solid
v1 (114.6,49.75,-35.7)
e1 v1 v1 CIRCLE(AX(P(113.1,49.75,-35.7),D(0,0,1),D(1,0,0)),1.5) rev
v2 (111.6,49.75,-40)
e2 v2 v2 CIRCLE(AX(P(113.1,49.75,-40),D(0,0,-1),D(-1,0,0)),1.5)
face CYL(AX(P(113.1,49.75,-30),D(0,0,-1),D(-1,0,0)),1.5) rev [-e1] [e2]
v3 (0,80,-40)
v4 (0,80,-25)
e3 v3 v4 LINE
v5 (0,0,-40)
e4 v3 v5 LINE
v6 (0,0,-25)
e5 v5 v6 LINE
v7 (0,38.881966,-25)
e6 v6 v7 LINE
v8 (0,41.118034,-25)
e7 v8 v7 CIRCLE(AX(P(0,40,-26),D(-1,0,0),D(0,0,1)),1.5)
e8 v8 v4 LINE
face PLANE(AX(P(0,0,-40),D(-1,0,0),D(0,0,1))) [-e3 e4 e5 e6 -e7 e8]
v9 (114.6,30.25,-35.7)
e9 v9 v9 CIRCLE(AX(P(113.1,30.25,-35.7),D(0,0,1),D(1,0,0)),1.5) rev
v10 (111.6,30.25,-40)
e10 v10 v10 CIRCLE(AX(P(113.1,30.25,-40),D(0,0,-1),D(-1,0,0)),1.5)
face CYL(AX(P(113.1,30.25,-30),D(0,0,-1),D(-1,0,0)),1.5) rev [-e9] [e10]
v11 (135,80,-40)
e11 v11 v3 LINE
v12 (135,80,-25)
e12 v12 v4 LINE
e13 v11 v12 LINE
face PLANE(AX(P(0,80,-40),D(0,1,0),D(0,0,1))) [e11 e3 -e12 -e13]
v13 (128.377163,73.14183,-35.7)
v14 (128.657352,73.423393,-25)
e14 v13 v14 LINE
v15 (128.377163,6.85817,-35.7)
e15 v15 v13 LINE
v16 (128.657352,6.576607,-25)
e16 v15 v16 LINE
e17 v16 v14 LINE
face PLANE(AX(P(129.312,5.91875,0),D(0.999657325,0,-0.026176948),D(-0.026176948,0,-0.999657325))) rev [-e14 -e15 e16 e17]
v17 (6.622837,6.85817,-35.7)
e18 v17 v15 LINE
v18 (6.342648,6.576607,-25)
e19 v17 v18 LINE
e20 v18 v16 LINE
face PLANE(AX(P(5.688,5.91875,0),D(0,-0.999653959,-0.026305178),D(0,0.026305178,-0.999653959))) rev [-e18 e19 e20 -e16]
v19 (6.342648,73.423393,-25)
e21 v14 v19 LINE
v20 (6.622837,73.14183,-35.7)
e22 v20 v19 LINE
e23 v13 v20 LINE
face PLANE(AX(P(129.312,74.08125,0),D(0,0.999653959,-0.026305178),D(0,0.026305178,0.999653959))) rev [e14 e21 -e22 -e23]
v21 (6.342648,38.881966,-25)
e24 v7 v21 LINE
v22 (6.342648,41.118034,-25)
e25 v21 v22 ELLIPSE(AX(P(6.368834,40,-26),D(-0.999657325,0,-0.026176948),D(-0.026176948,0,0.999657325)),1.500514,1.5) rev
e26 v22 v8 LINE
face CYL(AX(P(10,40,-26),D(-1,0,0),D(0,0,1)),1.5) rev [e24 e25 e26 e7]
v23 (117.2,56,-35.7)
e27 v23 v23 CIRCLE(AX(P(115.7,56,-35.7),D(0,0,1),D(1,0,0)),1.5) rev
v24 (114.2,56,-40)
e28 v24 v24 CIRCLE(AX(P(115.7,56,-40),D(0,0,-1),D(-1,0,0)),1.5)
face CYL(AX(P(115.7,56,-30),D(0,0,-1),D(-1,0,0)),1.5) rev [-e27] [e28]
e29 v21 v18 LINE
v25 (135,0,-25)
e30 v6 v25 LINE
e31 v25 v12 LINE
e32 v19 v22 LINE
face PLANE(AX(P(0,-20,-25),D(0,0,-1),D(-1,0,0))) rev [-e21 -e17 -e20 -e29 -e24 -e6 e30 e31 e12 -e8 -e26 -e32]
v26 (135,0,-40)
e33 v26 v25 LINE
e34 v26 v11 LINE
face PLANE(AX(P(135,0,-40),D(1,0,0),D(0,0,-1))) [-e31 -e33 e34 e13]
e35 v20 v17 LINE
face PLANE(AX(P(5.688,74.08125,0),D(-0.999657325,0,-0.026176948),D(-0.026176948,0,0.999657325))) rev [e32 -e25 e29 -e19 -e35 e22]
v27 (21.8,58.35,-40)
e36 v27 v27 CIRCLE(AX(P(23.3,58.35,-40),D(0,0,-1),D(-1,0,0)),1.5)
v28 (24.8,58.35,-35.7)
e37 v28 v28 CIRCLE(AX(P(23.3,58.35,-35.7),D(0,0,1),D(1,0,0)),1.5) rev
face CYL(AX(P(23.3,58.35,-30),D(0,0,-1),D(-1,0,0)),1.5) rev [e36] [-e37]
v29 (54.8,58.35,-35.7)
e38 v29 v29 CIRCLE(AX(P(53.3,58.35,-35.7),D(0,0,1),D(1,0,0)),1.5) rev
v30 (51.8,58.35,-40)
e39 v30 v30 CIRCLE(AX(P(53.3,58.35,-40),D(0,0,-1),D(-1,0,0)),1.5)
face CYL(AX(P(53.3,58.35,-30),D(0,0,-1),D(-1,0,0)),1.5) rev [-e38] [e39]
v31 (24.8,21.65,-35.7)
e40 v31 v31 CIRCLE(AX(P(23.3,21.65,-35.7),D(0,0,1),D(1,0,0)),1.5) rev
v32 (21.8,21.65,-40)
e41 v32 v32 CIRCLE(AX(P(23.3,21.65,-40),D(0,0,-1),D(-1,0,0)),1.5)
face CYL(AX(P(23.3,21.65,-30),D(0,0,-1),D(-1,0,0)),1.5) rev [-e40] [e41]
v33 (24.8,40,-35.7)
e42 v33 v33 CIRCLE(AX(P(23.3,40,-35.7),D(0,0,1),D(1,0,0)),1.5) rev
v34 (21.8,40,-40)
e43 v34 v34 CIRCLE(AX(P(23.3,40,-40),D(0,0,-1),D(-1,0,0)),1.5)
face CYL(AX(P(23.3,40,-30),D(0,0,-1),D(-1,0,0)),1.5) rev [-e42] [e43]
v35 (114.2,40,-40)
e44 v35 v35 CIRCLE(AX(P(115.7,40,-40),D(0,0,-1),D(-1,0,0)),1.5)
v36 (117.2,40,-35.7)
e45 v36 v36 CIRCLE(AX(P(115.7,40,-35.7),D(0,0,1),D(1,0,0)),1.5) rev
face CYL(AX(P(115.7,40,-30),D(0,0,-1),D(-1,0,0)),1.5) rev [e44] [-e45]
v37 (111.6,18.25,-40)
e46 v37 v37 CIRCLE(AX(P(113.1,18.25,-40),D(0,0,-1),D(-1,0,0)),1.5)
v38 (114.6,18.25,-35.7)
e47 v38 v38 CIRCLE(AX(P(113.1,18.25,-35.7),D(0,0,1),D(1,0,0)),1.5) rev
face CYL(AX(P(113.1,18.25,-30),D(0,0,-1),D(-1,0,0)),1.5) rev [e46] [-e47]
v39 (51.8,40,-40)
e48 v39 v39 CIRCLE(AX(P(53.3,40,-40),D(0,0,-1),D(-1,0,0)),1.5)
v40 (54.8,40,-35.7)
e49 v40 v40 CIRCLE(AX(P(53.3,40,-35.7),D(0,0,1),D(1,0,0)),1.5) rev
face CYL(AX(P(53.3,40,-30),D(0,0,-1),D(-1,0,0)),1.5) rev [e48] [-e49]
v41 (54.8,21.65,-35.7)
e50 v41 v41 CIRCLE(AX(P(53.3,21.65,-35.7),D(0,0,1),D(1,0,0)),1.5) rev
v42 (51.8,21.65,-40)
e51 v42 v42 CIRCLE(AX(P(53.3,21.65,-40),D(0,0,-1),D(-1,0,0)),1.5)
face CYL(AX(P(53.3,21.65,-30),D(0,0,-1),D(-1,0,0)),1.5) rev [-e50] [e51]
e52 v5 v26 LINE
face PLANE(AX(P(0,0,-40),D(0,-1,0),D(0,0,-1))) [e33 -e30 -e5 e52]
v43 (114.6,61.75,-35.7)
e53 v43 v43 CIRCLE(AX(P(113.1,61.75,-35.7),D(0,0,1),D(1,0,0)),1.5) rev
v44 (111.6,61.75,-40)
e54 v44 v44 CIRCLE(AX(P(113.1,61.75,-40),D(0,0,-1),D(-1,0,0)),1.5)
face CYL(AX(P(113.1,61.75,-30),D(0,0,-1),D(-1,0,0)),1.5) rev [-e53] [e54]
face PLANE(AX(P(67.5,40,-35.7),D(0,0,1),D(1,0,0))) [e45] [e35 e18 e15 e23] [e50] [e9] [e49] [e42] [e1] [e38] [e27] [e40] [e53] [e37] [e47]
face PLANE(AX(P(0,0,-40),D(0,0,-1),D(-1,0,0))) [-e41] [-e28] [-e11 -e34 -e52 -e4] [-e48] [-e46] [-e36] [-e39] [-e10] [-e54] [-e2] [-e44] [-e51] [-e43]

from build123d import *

# Parameters (mm, degrees)
SKETCH1_W           = 135
SKETCH1_H           = 80
BOSS_EXTRUDE1_DEPTH = 40
SKETCH2_R           = 1.5
CUT_EXTRUDE1_DEPTH  = 10
SKETCH3_R           = 1.5
CUT_EXTRUDE2_DEPTH  = 10
CAVITY1_START       = 5.91875
CAVITY1_DEPTH       = 68.1625
CAVITY1_START_2     = 5
CAVITY1_2_DEPTH     = 125
SKETCH4_W           = 135
SKETCH4_H           = 25
CUT_EXTRUDE3_DEPTH  = 100


with BuildPart() as part:
    # Sketch1 → Boss-Extrude1 (new body)
    with BuildSketch(Plane.XY):
        with Locations((67.5, 40)):
            Rectangle(SKETCH1_W, SKETCH1_H)
    extrude(amount=-BOSS_EXTRUDE1_DEPTH)

    # Sketch2 → Cut-Extrude1 (cut)
    with BuildSketch(Plane(origin=(0, 0, -40), x_dir=(-1, 0, 0), z_dir=(0, 0, -1))):
        with Locations((-53.3, 40)):
            Circle(SKETCH2_R)
        with Locations((-53.3, 58.35)):
            Circle(SKETCH2_R)
        with Locations((-53.3, 21.65)):
            Circle(SKETCH2_R)
        with Locations((-23.3, 58.35)):
            Circle(SKETCH2_R)
        with Locations((-23.3, 40)):
            Circle(SKETCH2_R)
        with Locations((-23.3, 21.65)):
            Circle(SKETCH2_R)
        with Locations((-115.7, 40)):
            Circle(SKETCH2_R)
        with Locations((-115.7, 56)):
            Circle(SKETCH2_R)
        with Locations((-113.1, 61.75)):
            Circle(SKETCH2_R)
        with Locations((-113.1, 49.75)):
            Circle(SKETCH2_R)
        with Locations((-113.1, 18.25)):
            Circle(SKETCH2_R)
        with Locations((-113.1, 30.25)):
            Circle(SKETCH2_R)
    extrude(amount=-CUT_EXTRUDE1_DEPTH, mode=Mode.SUBTRACT)

    # Sketch3 → Cut-Extrude2 (cut)
    with BuildSketch(Plane.ZY):
        with Locations((-10, 54.05)):
            Circle(SKETCH3_R)
        with Locations((-10, 25.95)):
            Circle(SKETCH3_R)
        with Locations((-26, 40)):
            Circle(SKETCH3_R)
    extrude(amount=-CUT_EXTRUDE2_DEPTH, mode=Mode.SUBTRACT)

    # Cavity1: read off the stored shape, not the designer's step
    # Cavity1 outline → Cavity1 (cut)
    with BuildSketch(Plane(origin=(0, 0, 0), x_dir=(1, 0, 0), z_dir=(0, 1, 0)).offset(CAVITY1_START)):
        Polygon((128.3771626, 35.7), (6.6228374, 35.7), (5.688, 0), (129.312, 0), align=None)
    extrude(amount=CAVITY1_DEPTH, mode=Mode.SUBTRACT)

    # Cavity1 2 outline → Cavity1 2 (add)
    with BuildSketch(Plane.YZ.offset(CAVITY1_START_2)):
        Polygon((74.08125, 0), (73.141830064, -35.7), (74.08125, -35.7), align=None)
        Polygon((6.858169936, -35.7), (5.91875, 0), (5.91875, -35.7), align=None)
    extrude(amount=CAVITY1_2_DEPTH)

    # Sketch4 → Cut-Extrude3 (cut)
    with BuildSketch(Plane(origin=(0, 80, 0), x_dir=(1, 0, 0), z_dir=(0, 1, 0))):
        with Locations((67.5, 12.5)):
            Rectangle(SKETCH4_W, SKETCH4_H)
    extrude(amount=-CUT_EXTRUDE3_DEPTH, mode=Mode.SUBTRACT)


solid = part.part
